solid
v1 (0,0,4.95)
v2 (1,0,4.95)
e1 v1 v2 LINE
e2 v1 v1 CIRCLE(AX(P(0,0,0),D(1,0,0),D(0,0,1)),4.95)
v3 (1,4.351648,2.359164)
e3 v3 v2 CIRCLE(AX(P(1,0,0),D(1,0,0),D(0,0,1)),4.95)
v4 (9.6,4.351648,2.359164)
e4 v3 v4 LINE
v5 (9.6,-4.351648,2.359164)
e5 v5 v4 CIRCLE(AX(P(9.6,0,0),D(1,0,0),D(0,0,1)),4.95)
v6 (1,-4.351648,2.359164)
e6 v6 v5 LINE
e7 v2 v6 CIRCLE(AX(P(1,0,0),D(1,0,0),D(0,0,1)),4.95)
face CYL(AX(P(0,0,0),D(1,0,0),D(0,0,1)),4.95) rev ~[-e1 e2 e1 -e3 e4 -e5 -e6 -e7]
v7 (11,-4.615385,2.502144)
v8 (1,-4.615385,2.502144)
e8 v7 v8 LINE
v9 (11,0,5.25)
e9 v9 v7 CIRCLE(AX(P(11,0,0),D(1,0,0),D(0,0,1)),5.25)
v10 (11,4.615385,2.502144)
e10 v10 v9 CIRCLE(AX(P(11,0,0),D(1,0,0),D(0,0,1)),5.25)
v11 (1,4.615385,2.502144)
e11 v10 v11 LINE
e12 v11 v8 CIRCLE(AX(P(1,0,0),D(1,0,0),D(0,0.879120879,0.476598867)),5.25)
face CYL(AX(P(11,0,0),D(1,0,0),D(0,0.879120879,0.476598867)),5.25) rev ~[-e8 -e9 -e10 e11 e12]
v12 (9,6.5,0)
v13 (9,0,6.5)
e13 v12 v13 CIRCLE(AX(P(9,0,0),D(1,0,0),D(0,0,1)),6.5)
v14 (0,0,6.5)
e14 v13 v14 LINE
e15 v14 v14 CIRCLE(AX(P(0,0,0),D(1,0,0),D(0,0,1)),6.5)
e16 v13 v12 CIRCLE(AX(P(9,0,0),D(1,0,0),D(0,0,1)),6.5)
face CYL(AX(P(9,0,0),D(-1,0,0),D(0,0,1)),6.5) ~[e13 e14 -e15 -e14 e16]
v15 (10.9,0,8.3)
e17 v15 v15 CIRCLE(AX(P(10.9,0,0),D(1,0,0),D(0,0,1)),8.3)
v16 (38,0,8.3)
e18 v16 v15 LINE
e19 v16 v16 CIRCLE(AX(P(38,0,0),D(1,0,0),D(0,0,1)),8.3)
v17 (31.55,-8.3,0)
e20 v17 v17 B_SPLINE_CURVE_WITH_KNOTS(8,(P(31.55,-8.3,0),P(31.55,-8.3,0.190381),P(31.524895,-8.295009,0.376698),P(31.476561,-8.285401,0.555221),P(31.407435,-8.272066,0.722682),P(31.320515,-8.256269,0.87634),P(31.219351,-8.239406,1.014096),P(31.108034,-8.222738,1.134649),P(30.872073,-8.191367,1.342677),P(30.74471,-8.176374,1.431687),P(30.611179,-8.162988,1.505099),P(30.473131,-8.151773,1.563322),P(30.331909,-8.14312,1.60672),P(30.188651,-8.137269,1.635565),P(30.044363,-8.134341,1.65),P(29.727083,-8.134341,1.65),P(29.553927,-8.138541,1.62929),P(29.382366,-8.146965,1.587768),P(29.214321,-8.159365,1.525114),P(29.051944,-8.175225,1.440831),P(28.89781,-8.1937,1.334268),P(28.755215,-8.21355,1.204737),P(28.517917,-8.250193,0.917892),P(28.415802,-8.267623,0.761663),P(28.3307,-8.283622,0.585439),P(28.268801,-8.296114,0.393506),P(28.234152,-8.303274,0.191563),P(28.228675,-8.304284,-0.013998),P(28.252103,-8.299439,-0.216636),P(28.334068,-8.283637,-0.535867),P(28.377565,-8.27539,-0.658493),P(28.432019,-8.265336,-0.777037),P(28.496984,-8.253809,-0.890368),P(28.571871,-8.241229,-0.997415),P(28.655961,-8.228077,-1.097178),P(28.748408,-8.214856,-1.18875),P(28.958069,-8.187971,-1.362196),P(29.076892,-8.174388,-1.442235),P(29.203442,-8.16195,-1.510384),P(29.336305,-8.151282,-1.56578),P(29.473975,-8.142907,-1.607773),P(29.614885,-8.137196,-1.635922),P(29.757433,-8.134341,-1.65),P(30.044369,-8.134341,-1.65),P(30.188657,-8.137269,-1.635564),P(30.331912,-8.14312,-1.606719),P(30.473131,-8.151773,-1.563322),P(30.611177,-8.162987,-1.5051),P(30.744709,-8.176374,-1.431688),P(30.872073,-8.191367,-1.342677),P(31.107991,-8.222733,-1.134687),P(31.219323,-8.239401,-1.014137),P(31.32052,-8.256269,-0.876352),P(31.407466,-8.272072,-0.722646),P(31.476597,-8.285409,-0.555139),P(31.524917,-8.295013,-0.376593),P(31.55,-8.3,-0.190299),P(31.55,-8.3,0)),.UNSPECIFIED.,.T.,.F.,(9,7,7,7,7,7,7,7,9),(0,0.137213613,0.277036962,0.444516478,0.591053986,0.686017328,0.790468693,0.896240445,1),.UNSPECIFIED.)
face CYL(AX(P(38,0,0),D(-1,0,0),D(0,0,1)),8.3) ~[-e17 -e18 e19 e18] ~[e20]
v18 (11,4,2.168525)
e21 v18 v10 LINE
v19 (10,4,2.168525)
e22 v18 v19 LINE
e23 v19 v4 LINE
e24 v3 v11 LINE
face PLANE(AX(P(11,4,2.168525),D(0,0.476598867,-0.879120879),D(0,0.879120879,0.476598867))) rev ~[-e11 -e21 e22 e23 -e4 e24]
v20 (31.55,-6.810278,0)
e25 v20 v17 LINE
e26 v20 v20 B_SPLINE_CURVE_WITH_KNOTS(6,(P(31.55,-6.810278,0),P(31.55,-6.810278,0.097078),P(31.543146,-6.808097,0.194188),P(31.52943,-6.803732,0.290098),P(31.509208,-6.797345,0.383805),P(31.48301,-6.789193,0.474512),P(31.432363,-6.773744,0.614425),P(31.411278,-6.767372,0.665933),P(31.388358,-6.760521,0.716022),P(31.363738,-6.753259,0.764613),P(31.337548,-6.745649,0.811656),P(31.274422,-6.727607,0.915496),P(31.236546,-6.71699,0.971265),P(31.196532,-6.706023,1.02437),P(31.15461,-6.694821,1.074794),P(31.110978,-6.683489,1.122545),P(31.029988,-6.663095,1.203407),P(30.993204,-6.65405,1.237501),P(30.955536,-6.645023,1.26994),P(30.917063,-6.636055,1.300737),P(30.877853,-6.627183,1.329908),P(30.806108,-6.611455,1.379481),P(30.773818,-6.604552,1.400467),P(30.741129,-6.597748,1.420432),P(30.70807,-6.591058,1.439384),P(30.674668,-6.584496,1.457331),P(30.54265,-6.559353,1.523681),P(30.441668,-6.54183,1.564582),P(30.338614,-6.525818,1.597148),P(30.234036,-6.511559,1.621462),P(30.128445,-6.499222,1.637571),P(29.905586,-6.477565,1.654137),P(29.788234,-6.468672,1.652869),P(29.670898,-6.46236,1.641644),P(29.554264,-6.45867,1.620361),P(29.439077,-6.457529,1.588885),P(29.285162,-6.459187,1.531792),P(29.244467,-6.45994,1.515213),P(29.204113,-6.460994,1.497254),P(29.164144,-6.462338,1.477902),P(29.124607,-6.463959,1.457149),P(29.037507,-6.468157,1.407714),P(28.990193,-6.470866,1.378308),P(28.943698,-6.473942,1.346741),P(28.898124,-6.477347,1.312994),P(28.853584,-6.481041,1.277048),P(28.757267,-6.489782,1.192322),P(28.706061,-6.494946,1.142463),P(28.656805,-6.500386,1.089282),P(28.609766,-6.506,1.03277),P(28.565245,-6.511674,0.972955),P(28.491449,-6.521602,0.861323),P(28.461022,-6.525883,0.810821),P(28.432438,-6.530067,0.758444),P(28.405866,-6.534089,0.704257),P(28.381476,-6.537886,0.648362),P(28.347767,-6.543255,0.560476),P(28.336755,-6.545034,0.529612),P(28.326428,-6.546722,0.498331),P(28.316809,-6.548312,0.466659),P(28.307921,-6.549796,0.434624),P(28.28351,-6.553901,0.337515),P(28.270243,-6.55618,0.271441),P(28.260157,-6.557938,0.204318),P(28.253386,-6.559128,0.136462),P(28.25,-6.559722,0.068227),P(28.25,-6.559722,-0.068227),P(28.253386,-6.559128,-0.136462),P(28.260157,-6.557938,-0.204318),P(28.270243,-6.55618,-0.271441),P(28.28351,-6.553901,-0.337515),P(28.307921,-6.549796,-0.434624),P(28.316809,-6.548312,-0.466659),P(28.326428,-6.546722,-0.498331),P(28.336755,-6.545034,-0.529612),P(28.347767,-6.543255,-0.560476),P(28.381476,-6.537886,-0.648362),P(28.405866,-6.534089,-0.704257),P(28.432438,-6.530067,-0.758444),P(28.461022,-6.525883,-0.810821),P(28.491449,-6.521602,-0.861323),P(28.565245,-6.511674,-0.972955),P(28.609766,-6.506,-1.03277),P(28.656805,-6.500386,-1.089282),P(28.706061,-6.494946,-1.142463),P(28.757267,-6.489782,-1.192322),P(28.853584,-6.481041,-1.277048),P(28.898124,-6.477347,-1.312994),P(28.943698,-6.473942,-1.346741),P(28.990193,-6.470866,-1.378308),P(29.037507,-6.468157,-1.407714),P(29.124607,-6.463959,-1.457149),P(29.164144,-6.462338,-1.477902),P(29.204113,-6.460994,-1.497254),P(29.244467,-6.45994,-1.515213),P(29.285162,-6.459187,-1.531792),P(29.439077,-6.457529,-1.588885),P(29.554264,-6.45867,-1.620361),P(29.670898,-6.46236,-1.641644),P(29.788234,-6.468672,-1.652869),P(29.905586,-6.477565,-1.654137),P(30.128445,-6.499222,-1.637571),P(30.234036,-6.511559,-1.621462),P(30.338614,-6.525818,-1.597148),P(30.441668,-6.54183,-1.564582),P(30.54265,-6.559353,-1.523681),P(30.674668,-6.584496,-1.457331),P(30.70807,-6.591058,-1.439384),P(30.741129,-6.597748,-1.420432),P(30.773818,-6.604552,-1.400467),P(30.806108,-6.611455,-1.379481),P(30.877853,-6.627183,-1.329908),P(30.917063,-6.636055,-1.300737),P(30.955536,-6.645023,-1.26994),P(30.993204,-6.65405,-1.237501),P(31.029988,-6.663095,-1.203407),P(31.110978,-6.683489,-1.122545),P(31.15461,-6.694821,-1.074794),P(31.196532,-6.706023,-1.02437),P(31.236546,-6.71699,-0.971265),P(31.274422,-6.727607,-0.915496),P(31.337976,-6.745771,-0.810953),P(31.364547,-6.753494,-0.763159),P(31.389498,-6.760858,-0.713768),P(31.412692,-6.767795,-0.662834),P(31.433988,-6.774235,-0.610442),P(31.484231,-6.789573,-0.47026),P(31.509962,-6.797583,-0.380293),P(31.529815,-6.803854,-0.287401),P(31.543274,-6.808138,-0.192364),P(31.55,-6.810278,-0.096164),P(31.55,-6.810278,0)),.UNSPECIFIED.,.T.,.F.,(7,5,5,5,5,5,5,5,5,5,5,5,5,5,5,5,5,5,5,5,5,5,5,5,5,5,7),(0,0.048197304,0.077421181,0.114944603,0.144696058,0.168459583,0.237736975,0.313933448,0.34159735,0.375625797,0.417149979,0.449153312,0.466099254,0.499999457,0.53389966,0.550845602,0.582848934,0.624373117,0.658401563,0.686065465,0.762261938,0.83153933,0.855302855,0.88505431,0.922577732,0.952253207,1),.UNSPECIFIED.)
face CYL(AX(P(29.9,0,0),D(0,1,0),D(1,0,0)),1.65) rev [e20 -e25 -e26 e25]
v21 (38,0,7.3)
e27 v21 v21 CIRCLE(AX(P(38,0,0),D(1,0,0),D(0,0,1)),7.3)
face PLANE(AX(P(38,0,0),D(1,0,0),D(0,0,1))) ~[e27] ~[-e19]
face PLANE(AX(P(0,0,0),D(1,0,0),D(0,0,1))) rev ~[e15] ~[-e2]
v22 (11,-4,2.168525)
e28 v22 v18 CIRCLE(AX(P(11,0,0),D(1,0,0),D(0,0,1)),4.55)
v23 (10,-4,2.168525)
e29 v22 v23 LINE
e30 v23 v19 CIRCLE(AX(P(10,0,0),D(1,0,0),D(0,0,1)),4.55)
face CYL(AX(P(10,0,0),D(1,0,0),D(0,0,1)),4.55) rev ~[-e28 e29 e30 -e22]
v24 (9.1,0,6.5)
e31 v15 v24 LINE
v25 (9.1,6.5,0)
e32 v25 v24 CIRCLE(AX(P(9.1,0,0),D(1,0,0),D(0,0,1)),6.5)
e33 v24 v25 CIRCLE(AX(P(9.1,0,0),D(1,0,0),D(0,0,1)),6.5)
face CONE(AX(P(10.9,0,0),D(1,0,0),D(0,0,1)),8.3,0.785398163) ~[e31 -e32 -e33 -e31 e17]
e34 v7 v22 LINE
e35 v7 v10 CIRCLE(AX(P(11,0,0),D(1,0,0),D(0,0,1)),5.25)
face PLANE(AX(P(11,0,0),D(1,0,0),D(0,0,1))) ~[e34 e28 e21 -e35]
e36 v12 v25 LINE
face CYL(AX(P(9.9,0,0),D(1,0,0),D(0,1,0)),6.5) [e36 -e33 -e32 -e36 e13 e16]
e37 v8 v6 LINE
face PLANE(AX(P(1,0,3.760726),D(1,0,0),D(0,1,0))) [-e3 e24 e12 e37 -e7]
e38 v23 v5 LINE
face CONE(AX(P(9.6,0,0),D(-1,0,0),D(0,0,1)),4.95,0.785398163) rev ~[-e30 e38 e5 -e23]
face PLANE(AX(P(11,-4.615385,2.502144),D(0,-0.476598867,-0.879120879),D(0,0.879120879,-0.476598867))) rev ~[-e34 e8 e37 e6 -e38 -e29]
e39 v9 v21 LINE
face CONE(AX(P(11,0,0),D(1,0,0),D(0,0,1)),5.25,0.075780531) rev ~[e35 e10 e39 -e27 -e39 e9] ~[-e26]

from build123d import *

# Parameters (mm, degrees)
F2_S5_R     = 6.5
F2_T6_DEPTH = 13
F4_DEPTH    = 10
F5_R        = 1.65
F6_DEPTH    = 8.301


# Not quite as in the source:
# - a fillet or chamfer that OpenCascade refuses, or shapes differently, is made with other operations: its cross-section is extruded or revolved along the edge and cut away or added


with BuildPart() as f1:
    # F0 (on Front) → F1 (revolve)
    with BuildSketch(Plane.XZ):
        Polygon((0, 6.5), (0, 4.95), (9.6, 4.95), (10, 4.55), (11, 4.55), (11, 5.25), (38, 7.3), (38, 8.3), (9, 8.3), (9, 6.5), align=None)
    revolve(axis=Axis((19, 0, 0), (1, 0, 0)))

    # F2: chamfer of 1.9 on 1 edges, made by hand


with BuildPart() as f2_tool2:
    # F2_s3 → F2_t4 (revolve)
    with BuildSketch(Plane.XZ):
        Polygon((10.9, 8.3), (9, 6.4), (9, 8.3), align=None)
    revolve(axis=Axis((9, 0, 0), (1, 0, 0)))

    # F2_s5 → F2_t6 (cut, symmetric)
    with BuildSketch(Plane.YZ.offset(9.9)):
        Circle(F2_S5_R)
    extrude(amount=F2_T6_DEPTH, both=True, mode=Mode.SUBTRACT)


with BuildPart() as f1_1:
    add(f1.part)

    # F2_t1: cut F2_tool2
    add(f2_tool2.part, mode=Mode.SUBTRACT)

    # F3 (on face) → F4 (cut)
    with BuildSketch(Plane.YZ.offset(11)):
        with BuildLine():
            Line((-4.6153846154, 2.502144051), (-4, 2.1685248442))
            ThreePointArc((-4, 2.1685248442), (0, 4.55), (4, 2.1685248442))
            Line((4, 2.1685248442), (4.6153846154, 2.502144051))
            ThreePointArc((4.6153846154, 2.502144051), (0, 5.25), (-4.6153846154, 2.502144051))
        make_face()
    extrude(amount=-F4_DEPTH, mode=Mode.SUBTRACT)

    # F5 (on Front) → F6 (cut, through all)
    with BuildSketch(Plane.XZ):
        with Locations((29.9, 0)):
            Circle(F5_R)
    extrude(amount=F6_DEPTH, mode=Mode.SUBTRACT)


solid = f1_1.part
